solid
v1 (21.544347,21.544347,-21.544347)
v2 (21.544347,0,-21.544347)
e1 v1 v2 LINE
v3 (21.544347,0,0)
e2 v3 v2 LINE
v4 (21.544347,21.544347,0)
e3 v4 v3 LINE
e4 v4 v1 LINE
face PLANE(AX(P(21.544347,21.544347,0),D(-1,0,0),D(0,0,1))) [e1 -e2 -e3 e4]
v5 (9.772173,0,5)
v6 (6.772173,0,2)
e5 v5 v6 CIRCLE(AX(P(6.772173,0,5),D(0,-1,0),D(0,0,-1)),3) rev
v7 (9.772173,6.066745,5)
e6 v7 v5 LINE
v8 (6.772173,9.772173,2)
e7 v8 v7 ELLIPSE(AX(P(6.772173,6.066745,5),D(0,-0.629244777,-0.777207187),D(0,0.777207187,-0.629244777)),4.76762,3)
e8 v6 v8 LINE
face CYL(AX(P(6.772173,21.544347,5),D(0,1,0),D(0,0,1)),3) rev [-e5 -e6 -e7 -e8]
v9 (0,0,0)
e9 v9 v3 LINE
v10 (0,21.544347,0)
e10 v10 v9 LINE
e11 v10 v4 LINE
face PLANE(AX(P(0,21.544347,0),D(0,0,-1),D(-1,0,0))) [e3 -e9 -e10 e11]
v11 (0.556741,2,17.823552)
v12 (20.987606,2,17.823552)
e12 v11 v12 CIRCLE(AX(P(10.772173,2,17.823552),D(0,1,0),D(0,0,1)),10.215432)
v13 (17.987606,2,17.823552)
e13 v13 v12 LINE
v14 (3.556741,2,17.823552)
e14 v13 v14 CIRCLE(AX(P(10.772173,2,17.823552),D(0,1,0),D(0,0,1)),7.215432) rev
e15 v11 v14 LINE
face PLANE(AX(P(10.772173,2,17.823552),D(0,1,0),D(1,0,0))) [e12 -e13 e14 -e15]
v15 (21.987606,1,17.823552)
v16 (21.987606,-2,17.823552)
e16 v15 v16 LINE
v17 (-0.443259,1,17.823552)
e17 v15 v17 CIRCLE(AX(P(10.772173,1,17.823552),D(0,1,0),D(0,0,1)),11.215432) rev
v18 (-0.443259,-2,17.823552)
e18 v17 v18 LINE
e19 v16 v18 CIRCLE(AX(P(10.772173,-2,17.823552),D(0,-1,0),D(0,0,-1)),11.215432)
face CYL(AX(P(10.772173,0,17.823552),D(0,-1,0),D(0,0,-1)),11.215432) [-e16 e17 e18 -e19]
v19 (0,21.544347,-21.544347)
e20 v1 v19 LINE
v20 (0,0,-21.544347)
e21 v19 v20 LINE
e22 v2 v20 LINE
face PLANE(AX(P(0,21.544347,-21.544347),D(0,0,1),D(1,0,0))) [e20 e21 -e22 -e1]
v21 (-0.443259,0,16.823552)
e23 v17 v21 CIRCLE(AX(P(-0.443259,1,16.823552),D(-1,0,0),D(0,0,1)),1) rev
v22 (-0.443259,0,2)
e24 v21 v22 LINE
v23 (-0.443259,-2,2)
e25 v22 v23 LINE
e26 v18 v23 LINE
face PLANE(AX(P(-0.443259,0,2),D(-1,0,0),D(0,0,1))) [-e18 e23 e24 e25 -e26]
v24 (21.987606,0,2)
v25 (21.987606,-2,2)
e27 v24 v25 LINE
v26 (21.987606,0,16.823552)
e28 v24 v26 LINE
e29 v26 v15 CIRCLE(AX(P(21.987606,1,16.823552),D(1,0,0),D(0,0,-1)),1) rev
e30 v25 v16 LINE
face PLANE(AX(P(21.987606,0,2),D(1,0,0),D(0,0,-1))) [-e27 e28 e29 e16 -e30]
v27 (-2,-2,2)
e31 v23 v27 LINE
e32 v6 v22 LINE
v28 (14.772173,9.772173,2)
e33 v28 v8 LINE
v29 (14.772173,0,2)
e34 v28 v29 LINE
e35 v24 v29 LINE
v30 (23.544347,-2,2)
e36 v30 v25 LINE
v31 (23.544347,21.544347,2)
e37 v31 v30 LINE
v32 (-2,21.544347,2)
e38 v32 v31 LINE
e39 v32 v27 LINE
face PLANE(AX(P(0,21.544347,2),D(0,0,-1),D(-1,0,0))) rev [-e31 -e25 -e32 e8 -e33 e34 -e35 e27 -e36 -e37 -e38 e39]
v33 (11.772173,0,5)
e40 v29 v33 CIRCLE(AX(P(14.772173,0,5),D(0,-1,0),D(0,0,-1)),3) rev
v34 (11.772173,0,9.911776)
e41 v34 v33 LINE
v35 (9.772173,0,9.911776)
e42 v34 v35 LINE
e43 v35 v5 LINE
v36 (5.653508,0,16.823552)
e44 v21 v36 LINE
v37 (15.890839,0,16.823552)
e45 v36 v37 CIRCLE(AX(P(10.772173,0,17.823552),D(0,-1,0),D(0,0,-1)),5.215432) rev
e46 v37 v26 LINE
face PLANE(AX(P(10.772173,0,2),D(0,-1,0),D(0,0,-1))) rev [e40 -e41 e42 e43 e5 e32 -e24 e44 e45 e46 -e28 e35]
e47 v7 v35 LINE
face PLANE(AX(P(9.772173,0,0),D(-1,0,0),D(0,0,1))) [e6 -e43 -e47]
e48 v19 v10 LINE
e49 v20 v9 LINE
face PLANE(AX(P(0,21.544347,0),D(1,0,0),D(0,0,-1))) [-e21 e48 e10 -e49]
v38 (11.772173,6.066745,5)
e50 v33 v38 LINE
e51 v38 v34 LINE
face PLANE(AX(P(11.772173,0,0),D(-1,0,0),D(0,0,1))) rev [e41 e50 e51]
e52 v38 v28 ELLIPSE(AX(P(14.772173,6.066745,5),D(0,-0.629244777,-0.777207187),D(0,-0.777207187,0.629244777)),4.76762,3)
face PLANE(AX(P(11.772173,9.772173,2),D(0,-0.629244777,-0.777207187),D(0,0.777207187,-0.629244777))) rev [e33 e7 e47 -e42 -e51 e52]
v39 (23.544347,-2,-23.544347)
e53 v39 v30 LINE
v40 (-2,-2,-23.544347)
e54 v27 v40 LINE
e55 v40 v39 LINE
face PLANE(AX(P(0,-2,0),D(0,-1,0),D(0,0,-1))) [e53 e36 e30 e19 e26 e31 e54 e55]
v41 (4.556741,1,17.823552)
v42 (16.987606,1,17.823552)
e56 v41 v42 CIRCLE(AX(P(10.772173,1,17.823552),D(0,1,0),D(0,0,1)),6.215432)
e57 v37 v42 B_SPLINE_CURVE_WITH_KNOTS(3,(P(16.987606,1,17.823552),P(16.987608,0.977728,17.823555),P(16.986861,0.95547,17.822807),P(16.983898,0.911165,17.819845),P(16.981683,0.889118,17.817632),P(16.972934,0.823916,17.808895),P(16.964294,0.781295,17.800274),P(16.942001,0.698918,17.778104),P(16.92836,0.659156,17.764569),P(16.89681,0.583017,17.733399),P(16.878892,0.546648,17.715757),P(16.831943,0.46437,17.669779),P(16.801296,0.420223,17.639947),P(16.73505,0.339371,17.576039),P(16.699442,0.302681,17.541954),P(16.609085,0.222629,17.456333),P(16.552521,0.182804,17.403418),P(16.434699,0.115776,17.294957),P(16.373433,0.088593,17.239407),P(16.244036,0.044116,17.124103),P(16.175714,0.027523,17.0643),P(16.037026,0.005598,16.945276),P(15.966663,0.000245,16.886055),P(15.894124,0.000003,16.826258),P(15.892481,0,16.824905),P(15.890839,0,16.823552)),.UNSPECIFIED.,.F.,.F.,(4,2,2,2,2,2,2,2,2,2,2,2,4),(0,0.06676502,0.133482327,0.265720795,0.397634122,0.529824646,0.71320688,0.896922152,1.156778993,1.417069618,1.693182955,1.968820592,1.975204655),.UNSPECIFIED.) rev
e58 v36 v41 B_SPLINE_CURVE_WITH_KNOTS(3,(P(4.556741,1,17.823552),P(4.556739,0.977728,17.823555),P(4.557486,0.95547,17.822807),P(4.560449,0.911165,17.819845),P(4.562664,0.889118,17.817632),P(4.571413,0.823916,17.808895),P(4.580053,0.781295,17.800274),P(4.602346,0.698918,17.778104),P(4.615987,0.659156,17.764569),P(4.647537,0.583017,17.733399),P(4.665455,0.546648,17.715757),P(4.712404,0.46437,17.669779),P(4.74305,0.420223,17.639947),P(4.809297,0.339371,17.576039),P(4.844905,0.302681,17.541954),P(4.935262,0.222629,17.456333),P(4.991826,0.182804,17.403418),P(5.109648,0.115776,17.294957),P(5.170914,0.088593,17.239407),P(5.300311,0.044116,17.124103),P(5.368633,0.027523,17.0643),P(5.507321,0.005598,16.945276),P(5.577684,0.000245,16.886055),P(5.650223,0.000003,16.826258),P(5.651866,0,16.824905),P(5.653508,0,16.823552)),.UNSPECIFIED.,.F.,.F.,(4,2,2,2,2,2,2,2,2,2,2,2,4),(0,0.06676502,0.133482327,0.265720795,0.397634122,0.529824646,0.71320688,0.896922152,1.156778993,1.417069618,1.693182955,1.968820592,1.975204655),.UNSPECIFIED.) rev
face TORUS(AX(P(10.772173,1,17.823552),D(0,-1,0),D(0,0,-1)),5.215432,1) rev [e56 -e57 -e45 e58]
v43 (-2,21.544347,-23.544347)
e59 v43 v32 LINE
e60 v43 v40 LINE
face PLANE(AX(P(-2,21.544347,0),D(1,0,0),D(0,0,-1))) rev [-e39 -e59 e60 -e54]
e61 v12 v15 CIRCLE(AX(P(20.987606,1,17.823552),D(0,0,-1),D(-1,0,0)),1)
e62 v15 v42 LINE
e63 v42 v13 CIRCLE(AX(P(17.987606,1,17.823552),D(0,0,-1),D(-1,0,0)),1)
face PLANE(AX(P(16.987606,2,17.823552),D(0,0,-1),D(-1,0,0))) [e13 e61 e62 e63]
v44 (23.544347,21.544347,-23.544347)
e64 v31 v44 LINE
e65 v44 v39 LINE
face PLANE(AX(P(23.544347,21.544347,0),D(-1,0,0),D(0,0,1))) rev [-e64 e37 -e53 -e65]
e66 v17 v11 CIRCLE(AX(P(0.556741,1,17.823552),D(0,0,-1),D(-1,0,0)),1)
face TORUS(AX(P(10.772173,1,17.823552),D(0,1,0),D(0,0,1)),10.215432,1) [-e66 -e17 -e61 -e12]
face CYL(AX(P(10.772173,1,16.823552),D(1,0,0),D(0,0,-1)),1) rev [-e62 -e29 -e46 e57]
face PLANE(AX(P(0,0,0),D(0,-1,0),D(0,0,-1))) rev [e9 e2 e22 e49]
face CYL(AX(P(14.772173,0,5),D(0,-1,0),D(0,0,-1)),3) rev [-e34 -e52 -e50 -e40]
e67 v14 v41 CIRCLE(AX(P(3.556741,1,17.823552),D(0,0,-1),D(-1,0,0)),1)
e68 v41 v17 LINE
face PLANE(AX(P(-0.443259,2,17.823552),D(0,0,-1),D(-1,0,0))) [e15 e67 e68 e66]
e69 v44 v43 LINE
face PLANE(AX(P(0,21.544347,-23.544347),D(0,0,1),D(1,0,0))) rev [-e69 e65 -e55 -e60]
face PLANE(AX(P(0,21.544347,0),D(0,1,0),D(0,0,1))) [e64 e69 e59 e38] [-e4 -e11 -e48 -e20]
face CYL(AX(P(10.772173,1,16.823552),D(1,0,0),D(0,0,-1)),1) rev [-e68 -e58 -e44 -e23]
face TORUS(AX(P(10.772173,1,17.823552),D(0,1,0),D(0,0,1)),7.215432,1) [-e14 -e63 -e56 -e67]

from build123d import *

# Parameters (mm, degrees)
SKETCH1_W           = 25.5443469
SKETCH1_H           = 25.5443469
SKETCH1_W_2         = 21.5443469
SKETCH1_H_2         = 21.5443469
EXTRUDE_THIN1_DEPTH = 21.5443469
SKETCH2_W           = 25.5443469
SKETCH2_H           = 25.5443469
BOSS_EXTRUDE1_DEPTH = 2
BOSS_EXTRUDE2_DEPTH = 2
BOSS_EXTRUDE3_DEPTH = 1
FILLET2_R           = 3
EXTRUDE_THIN2_DEPTH = 2
FILLET3_R           = 1


with BuildPart() as part:
    # Sketch1 → Extrude-Thin1 (new body)
    with BuildSketch(Plane(origin=(0, 0, 0), x_dir=(1, 0, 0), z_dir=(0, 1, 0))):
        with Locations((10.77217345, 10.77217345)):
            Rectangle(SKETCH1_W, SKETCH1_H)
        with Locations((10.77217345, 10.77217345)):
            Rectangle(SKETCH1_W_2, SKETCH1_H_2, mode=Mode.SUBTRACT)
    extrude(amount=EXTRUDE_THIN1_DEPTH)

    # Sketch2 → Boss-Extrude1 (add)
    with BuildSketch(Plane.XZ):
        with Locations((10.77217345, -10.77217345)):
            Rectangle(SKETCH2_W, SKETCH2_H)
    extrude(amount=BOSS_EXTRUDE1_DEPTH)

    # Sketch4 → Boss-Extrude2 (add)
    with BuildSketch(Plane.XZ.offset(2)):
        with BuildLine():
            Line((-0.443258652, 2), (-0.443258652, 17.823551836))
            ThreePointArc((-0.443258652, 17.823551836), (10.77217345, 29.038983939), (21.987605552, 17.823551836))
            Line((21.987605552, 17.823551836), (21.987605552, 2))
            ThreePointArc((21.987605552, 2), (10.77217345, -9.215432102), (-0.443258652, 2))
        make_face()
    extrude(amount=-BOSS_EXTRUDE2_DEPTH)

    # Sketch5 → Boss-Extrude3 (add, symmetric)
    with BuildSketch(Plane(origin=(10.77217345, 0, 0), x_dir=(0, 0, -1), z_dir=(1, 0, 0))):
        Polygon((-2, 9.77217345), (-9.911775918, 0), (-2, 0), align=None)
    extrude(amount=BOSS_EXTRUDE3_DEPTH, both=True)

    # Fillet2
    fillet2_edges = [part.edges().sort_by_distance(p)[0] for p in [
        (9.77217345, 4.886086725, 2),
        (11.77217345, 4.886086725, 2),
    ]]
    fillet(fillet2_edges, radius=FILLET2_R)

    # Sketch6 → Extrude-Thin2 (add)
    with BuildSketch(Plane(origin=(0, 0, 0), x_dir=(1, 0, 0), z_dir=(0, 1, 0))):
        with BuildLine():
            ThreePointArc((-0.443258652, -17.823551836), (10.77217345, -29.038983939), (21.987605552, -17.823551836))
            Line((21.987605552, -17.823551836), (16.987605552, -17.823551836))
            ThreePointArc((16.987605552, -17.823551836), (10.77217345, -24.038983939), (4.556741348, -17.823551836))
            Line((4.556741348, -17.823551836), (-0.443258652, -17.823551836))
        make_face()
    extrude(amount=EXTRUDE_THIN2_DEPTH)

    # Fillet3
    fillet3_edges = [part.edges().sort_by_distance(p)[0] for p in [
        (19.487605552, 0, 17.823551836),
        (2.056741348, 0, 17.823551836),
        (10.77217345, 2, 29.038983939),
        (10.77217345, 2, 24.038983939),
        (10.77217345, 0, 24.038983939),
    ]]
    fillet(fillet3_edges, radius=FILLET3_R - 0.0001)  # a hair under: the kernel refuses the full size


solid = part.part
